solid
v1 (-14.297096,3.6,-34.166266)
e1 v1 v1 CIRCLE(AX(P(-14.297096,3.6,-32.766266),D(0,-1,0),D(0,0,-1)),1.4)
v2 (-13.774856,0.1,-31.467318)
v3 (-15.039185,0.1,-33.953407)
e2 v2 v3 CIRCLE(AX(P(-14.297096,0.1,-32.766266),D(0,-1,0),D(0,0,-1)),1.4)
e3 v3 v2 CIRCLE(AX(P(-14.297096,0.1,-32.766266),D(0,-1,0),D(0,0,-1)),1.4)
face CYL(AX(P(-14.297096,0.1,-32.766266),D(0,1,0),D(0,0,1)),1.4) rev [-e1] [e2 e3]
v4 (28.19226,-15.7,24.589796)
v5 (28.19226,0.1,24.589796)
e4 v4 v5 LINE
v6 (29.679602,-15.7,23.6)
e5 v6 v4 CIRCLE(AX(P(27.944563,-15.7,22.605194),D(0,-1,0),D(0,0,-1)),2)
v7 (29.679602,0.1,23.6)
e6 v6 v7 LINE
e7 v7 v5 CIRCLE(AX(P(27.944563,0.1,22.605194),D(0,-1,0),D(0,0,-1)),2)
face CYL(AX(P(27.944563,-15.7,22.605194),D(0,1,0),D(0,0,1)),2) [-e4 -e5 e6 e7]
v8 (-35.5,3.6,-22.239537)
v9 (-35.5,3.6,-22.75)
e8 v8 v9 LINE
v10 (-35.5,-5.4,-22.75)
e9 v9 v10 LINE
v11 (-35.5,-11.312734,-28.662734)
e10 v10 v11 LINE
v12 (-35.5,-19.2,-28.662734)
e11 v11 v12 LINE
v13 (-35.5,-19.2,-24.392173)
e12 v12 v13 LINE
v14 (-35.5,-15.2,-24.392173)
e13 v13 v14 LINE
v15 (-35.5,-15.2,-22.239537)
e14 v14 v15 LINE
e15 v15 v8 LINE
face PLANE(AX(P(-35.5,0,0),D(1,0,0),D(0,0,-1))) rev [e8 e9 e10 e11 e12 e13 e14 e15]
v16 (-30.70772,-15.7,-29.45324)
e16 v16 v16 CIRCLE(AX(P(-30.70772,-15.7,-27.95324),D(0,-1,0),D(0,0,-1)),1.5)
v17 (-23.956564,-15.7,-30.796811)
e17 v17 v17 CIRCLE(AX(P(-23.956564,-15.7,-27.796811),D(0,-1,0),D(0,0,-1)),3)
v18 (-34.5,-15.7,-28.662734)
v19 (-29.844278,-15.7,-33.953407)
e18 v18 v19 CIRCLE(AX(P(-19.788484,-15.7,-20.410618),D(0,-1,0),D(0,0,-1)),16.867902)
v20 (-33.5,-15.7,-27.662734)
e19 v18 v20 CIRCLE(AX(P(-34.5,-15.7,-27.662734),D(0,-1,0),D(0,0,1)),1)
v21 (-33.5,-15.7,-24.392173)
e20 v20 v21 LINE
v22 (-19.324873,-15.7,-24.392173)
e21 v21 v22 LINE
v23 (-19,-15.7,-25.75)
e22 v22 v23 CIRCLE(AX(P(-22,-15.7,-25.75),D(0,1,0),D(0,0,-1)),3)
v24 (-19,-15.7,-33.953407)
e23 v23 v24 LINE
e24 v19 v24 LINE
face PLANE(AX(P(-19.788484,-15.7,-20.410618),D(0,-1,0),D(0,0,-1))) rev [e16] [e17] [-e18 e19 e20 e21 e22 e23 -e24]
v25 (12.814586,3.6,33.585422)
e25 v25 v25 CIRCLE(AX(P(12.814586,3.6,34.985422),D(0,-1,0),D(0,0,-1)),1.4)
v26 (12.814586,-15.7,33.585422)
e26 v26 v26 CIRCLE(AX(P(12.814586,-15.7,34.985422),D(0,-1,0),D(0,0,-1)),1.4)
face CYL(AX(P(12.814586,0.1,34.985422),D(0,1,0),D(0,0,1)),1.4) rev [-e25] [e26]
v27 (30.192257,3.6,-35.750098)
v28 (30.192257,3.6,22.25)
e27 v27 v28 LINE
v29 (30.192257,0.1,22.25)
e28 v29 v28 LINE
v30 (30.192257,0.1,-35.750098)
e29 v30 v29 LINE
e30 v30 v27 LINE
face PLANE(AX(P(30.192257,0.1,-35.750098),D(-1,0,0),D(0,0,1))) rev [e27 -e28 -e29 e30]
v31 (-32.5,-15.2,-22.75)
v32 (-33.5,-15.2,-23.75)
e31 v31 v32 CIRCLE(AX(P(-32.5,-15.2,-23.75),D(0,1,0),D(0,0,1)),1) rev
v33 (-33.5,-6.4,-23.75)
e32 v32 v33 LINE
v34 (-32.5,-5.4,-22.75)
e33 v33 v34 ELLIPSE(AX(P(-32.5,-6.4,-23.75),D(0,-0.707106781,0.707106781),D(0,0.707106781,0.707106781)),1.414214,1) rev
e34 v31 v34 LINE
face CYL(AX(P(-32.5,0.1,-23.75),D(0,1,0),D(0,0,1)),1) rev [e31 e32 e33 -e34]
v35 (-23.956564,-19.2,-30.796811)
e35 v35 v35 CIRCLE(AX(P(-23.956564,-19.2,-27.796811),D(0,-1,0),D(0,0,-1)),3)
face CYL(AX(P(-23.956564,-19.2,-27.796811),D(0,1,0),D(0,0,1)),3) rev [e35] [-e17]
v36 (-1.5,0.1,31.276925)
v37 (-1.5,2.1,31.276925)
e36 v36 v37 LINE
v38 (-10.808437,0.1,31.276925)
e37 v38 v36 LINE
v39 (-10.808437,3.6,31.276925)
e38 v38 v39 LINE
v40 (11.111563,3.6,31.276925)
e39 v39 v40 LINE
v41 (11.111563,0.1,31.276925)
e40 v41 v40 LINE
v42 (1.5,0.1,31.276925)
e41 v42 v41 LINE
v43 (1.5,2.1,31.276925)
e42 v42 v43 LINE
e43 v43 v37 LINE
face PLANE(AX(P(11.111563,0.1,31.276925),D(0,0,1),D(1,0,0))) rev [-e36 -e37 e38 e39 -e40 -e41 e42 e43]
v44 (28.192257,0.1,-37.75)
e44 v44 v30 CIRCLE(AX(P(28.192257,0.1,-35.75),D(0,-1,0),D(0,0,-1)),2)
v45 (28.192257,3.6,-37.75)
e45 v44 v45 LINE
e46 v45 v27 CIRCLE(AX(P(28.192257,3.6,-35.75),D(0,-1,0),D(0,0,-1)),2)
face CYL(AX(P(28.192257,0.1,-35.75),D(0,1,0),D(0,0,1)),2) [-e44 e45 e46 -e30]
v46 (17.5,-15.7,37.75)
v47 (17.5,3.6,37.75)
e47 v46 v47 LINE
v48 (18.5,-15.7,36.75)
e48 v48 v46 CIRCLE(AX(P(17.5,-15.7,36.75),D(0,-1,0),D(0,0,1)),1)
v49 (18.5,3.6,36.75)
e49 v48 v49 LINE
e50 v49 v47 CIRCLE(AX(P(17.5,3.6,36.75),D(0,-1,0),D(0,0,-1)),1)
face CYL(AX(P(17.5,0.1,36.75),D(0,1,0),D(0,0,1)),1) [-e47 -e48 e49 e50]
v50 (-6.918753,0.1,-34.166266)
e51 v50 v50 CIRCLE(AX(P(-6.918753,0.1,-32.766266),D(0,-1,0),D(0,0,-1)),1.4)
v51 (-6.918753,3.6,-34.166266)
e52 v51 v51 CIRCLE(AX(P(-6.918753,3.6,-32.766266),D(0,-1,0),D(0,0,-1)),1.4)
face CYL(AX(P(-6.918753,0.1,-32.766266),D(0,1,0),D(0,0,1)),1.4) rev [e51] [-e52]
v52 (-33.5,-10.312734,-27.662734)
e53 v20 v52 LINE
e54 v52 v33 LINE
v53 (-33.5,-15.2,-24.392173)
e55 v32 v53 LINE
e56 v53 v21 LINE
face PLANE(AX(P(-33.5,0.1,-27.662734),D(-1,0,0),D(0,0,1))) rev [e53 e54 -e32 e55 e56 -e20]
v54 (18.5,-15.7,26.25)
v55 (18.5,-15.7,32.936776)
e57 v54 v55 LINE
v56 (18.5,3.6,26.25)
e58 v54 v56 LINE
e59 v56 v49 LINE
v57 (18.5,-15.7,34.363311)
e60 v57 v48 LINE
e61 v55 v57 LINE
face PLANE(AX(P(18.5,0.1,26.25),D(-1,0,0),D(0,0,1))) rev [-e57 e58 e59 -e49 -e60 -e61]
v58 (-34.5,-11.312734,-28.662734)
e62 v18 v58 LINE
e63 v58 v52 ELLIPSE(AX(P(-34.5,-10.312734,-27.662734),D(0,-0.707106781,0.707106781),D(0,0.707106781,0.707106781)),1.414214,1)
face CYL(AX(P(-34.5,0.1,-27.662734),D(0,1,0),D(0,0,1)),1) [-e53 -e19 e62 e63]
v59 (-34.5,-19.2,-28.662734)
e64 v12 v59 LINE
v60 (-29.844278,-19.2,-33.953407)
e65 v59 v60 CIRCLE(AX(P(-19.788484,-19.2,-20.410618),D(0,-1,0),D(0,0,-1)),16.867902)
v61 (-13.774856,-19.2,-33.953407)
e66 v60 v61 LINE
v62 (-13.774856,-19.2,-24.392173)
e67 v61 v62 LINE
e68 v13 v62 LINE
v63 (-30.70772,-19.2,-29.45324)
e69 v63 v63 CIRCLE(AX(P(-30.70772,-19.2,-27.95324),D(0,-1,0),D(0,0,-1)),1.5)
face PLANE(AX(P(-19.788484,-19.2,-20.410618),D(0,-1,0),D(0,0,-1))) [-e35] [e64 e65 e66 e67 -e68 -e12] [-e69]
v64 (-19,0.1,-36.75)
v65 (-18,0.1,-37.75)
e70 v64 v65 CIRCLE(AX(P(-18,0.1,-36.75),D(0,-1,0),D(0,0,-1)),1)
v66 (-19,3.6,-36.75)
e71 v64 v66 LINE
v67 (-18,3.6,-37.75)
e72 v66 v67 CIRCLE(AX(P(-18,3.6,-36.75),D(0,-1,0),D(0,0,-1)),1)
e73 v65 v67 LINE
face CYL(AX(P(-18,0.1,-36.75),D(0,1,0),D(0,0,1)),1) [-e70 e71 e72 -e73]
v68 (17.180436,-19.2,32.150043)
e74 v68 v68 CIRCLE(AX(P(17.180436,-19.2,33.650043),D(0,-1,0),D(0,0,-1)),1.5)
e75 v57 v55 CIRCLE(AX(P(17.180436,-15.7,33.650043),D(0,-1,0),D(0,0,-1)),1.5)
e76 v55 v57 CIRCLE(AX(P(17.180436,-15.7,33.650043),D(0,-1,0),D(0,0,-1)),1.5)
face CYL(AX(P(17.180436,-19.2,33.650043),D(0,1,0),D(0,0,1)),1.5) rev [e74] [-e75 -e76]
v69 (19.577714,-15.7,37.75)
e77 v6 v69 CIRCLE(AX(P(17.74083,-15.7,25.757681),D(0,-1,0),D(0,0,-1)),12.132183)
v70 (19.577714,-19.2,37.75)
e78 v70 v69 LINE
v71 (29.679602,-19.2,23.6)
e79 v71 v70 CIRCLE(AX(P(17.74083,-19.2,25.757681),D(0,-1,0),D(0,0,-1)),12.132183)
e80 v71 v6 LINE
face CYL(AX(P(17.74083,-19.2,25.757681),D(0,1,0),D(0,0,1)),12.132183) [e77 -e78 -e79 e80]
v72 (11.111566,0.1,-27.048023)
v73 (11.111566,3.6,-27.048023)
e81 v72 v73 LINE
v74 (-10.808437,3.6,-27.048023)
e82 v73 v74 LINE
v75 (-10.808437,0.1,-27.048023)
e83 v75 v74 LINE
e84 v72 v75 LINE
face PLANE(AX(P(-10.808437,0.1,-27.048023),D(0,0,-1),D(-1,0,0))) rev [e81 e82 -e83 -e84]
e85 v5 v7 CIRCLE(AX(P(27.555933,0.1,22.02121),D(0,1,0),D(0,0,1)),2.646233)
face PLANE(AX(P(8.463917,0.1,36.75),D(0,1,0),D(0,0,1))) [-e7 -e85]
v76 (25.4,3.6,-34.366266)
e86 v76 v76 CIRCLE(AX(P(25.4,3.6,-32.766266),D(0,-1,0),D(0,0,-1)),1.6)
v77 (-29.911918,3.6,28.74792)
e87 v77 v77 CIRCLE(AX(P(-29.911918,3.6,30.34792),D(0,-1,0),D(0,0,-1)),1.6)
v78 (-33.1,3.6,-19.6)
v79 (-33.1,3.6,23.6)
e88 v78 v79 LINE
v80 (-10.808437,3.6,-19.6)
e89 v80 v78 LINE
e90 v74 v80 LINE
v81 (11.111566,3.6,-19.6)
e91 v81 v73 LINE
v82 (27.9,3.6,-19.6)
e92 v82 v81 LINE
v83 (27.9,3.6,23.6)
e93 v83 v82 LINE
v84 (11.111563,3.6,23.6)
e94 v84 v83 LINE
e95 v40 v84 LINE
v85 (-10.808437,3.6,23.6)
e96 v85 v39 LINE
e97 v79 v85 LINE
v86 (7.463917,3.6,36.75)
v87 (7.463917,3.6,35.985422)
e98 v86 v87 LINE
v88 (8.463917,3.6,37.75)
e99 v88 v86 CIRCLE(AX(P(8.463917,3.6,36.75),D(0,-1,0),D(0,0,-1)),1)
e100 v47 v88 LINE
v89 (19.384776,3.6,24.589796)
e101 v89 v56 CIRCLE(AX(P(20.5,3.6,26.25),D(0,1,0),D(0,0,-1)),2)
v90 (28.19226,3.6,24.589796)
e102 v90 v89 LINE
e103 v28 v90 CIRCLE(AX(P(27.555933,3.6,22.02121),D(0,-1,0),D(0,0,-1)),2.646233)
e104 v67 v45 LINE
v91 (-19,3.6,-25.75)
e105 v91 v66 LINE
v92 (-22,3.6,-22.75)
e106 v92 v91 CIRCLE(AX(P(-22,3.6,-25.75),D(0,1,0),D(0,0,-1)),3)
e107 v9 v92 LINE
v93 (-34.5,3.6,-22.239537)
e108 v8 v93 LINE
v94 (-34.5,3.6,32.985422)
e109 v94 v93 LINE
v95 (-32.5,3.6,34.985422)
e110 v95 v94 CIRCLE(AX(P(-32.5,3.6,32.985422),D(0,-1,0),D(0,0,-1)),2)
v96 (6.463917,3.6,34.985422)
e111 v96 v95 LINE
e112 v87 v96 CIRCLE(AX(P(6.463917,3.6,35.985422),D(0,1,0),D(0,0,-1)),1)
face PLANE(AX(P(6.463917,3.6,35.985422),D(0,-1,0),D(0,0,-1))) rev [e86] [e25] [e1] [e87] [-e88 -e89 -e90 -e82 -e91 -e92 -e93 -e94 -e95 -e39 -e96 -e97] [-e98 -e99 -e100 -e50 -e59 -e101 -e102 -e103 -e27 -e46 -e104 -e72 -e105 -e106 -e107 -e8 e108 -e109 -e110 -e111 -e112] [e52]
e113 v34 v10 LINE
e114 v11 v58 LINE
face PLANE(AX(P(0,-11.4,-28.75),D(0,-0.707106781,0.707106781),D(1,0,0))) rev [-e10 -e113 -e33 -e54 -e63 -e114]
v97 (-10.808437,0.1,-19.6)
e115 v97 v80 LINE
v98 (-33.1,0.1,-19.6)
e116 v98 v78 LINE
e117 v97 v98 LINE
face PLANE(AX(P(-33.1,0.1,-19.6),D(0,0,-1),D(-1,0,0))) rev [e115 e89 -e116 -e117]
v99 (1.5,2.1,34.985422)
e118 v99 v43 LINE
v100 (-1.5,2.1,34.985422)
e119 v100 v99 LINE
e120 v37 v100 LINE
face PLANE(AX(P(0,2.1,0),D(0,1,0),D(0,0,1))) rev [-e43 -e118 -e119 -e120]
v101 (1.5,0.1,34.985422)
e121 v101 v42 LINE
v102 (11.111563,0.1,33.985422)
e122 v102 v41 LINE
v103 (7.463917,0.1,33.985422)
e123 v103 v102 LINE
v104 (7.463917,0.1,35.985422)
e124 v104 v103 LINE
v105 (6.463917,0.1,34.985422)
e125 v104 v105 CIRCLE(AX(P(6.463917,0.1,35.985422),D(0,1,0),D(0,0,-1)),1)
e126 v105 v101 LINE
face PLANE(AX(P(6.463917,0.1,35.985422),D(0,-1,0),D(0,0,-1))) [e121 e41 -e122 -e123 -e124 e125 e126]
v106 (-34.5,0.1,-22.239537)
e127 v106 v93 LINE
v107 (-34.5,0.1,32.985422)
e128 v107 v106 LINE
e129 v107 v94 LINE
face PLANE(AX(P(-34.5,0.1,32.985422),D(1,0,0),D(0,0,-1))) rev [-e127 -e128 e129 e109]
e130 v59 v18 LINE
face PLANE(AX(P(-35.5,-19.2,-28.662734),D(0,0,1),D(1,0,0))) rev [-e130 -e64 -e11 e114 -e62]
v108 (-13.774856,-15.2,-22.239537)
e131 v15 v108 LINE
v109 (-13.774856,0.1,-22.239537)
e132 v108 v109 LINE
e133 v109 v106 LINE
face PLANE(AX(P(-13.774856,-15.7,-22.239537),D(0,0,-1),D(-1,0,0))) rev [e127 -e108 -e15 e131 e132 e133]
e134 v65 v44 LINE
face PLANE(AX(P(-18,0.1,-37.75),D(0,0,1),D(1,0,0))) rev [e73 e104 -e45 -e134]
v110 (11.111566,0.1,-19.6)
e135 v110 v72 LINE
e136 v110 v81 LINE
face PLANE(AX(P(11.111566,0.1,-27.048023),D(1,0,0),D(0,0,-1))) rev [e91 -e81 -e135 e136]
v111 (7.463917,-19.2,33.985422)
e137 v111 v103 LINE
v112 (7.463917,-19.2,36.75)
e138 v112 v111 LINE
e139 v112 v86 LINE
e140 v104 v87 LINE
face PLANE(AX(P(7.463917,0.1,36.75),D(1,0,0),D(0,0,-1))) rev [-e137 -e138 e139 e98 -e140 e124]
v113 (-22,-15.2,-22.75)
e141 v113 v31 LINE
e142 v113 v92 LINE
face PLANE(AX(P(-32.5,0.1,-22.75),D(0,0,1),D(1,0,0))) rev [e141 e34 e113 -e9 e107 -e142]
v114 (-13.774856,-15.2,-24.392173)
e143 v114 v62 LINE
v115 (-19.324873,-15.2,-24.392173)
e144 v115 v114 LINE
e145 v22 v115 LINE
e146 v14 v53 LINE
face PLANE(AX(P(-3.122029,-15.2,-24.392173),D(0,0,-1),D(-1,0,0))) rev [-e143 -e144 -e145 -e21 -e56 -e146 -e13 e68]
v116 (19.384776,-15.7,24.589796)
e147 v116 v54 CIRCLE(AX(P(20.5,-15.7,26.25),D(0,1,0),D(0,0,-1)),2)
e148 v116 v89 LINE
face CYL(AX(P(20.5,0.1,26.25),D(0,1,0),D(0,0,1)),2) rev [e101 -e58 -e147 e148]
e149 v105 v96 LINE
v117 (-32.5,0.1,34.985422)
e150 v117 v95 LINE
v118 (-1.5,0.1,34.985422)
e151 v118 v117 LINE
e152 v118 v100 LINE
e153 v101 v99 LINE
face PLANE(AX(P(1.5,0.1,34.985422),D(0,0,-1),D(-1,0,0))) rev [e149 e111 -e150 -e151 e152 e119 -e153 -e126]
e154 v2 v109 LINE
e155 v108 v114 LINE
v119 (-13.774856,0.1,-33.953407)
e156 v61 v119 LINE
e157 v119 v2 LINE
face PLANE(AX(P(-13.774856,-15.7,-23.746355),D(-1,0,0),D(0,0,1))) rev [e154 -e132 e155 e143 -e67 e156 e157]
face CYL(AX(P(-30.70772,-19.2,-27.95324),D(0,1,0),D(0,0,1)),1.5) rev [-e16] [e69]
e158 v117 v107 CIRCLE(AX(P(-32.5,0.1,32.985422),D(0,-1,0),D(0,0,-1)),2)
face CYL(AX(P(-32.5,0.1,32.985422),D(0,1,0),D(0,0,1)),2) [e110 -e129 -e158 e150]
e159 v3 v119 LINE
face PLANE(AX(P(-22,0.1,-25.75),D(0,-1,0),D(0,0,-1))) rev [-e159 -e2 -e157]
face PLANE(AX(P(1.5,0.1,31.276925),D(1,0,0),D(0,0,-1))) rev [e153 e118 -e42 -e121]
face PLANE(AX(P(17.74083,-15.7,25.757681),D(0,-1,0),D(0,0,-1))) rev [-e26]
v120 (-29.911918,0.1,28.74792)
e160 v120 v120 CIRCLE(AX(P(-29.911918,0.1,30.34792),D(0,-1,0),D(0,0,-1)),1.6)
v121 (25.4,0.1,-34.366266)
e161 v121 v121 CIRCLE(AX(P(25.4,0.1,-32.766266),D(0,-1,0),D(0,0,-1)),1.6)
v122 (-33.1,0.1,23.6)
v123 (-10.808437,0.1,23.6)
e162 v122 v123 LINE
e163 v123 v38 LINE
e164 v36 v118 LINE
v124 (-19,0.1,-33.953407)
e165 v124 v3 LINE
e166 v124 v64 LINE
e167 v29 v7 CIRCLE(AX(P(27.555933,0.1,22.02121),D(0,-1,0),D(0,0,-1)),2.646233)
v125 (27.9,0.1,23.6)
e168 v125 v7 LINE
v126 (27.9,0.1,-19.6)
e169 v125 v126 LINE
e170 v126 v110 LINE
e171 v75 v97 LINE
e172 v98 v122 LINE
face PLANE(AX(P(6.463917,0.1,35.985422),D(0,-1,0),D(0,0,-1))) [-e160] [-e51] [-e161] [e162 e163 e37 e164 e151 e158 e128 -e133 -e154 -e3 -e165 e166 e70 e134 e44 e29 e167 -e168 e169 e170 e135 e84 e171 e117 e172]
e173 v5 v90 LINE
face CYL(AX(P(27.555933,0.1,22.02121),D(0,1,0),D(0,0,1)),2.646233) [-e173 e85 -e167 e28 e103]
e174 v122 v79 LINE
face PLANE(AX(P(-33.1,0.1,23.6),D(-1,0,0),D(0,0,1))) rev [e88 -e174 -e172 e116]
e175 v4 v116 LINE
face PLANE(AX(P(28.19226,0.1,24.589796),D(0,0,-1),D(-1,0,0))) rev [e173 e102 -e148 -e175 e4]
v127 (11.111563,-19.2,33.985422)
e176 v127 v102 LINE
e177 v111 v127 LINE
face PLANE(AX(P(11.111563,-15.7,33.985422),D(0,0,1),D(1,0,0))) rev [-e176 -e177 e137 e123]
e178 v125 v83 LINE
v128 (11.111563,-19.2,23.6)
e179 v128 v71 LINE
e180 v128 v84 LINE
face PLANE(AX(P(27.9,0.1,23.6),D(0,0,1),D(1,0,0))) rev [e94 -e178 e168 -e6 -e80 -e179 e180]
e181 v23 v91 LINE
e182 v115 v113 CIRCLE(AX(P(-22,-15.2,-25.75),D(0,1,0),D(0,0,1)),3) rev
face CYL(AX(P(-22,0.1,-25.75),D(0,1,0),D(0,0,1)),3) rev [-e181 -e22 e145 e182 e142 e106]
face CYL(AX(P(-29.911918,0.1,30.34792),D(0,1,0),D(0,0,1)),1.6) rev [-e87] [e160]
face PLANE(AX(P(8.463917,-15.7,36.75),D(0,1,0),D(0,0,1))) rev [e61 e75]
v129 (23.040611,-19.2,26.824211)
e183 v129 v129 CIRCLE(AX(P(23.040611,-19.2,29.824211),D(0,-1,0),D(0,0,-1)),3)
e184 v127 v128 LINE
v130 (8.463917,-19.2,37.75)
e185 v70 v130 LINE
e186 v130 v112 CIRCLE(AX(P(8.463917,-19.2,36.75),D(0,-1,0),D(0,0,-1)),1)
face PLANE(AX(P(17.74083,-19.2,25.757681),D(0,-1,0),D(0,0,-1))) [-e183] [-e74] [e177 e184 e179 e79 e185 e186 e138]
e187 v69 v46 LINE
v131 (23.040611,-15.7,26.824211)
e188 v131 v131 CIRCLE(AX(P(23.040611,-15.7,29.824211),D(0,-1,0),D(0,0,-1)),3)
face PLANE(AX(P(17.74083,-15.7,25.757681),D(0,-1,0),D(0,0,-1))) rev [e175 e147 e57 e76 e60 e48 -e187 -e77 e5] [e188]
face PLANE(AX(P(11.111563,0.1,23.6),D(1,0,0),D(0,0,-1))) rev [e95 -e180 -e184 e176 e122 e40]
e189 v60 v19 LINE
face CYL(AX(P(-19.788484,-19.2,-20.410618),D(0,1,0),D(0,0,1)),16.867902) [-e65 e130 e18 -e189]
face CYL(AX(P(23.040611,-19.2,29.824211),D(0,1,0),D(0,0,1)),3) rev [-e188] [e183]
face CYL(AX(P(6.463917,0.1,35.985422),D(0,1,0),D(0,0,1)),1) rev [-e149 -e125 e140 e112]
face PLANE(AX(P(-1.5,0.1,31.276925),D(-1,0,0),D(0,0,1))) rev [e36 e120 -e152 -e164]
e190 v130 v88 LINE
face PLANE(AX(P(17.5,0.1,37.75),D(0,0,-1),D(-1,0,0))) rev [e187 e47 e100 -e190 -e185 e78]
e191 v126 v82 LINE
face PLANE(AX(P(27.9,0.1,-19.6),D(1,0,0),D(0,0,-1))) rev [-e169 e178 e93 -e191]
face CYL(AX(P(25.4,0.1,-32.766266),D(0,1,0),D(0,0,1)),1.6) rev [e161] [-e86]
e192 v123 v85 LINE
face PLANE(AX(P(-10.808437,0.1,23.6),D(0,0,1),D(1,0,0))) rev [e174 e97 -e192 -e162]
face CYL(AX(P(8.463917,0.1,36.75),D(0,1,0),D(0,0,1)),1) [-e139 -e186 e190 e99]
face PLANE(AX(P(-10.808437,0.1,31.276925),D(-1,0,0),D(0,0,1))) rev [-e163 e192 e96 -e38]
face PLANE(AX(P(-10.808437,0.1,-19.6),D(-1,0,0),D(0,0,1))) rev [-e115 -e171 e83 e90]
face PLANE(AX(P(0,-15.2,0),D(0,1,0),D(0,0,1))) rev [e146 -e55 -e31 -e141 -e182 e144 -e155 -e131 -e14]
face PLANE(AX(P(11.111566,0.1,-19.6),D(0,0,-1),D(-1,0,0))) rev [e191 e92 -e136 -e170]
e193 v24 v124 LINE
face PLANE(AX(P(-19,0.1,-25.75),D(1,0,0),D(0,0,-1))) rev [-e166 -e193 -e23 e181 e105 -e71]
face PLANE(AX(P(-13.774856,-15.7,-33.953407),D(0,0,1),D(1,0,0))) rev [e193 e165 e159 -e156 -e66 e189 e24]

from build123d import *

# Parameters (mm, degrees)
SKETCH2_R           = 1.4
SKETCH2_R_2         = 1.6
BOSS_EXTRUDE1_DEPTH = 3.5
SKETCH3_R           = 1.4
BOSS_EXTRUDE2_DEPTH = 15.8
SKETCH4_R           = 3
SKETCH4_R_2         = 1.5
BOSS_EXTRUDE3_DEPTH = 3.5
SKETCH5_W           = 3
SKETCH5_H           = 3.708496363
BOSS_EXTRUDE4_DEPTH = 1.5
SKETCH7_W           = 35.498397003
SKETCH7_H           = 12.144188448
CUT_EXTRUDE2_DEPTH  = 4
BOSS_EXTRUDE5_DEPTH = 1
SKETCH6_W           = 15.172785082
SKETCH6_H           = 14.006435155
CUT_EXTRUDE3_DEPTH  = 15
CHAMFER1_START      = -11.4
CHAMFER1_DEPTH      = 0.087265638
CHAMFER1_START_2    = -35.5
CHAMFER1_2_DEPTH    = 3
CHAMFER1_START_3    = -11.312734362
CHAMFER1_3_DEPTH    = 7.312734362


with BuildPart() as part:
    # Sketch2 → Boss-Extrude1 (new body)
    with BuildSketch(Plane.XZ.offset(-3.6)):
        with BuildLine():
            Line((11.111566046, -27.048023457), (11.111566046, -19.6))
            Line((11.111566046, -19.6), (27.9, -19.6))
            Line((27.9, -19.6), (27.9, 23.6))
            Line((27.9, 23.6), (11.111563156, 23.6))
            Line((11.111563156, 23.6), (11.111563156, 31.276925258))
            Line((11.111563156, 31.276925258), (1.5, 31.276925258))
            Line((1.5, 31.276925258), (1.5, 34.985421621))
            Line((1.5, 34.985421621), (6.463917188, 34.985421621))
            ThreePointArc((6.463917188, 34.985421621), (7.171023969, 35.278314839), (7.463917188, 35.985421621))
            Line((7.463917188, 35.985421621), (7.463917188, 36.75))
            ThreePointArc((7.463917188, 36.75), (7.756810407, 37.457106781), (8.463917188, 37.75))
            Line((8.463917188, 37.75), (17.5, 37.75))
            ThreePointArc((17.5, 37.75), (18.207106781, 37.457106781), (18.5, 36.75))
            Line((18.5, 36.75), (18.5, 26.25))
            ThreePointArc((18.5, 26.25), (18.73500033, 25.309374588), (19.384776166, 24.589796458))
            Line((19.384776166, 24.589796458), (28.192260407, 24.589796458))
            ThreePointArc((28.192260407, 24.589796458), (29.567455824, 23.740606822), (30.192257213, 22.25))
            Line((30.192257213, 22.25), (30.192257213, -35.750098385))
            ThreePointArc((30.192257213, -35.750098385), (29.606435992, -37.164248347), (28.192257213, -37.75))
            Line((28.192257213, -37.75), (-18, -37.75))
            ThreePointArc((-18, -37.75), (-18.707106781, -37.457106781), (-19, -36.75))
            Line((-19, -36.75), (-19, -25.75))
            ThreePointArc((-19, -25.75), (-19.878679656, -23.628679656), (-22, -22.75))
            Line((-22, -22.75), (-32.5, -22.75))
            ThreePointArc((-32.5, -22.75), (-33.207106781, -23.042893219), (-33.5, -23.75))
            Line((-33.5, -23.75), (-33.5, -27.662734362))
            ThreePointArc((-33.5, -27.662734362), (-33.792893219, -28.369841143), (-34.5, -28.662734362))
            Line((-34.5, -28.662734362), (-34.5, 32.985421621))
            ThreePointArc((-34.5, 32.985421621), (-33.914213562, 34.399635183), (-32.5, 34.985421621))
            Line((-32.5, 34.985421621), (-1.5, 34.985421621))
            Line((-1.5, 34.985421621), (-1.5, 31.276925258))
            Line((-1.5, 31.276925258), (-10.808436895, 31.276925258))
            Line((-10.808436895, 31.276925258), (-10.808436895, 23.6))
            Line((-10.808436895, 23.6), (-33.1, 23.6))
            Line((-33.1, 23.6), (-33.1, -19.6))
            Line((-33.1, -19.6), (-10.808436895, -19.6))
            Line((-10.808436895, -19.6), (-10.808436895, -27.048023457))
            Line((-10.808436895, -27.048023457), (11.111566046, -27.048023457))
        make_face()
        with Locations(Location((-6.918752516, -32.76626587, 0), (0, 0, 270))):
            Circle(SKETCH2_R, mode=Mode.SUBTRACT)
        with Locations(Location((25.4, -32.76626587, 0), (0, 0, 270))):
            Circle(SKETCH2_R_2, mode=Mode.SUBTRACT)
        with Locations(Location((-14.297096298, -32.76626587, 0), (0, 0, 270))):
            Circle(SKETCH2_R, mode=Mode.SUBTRACT)
        with Locations(Location((-29.911917882, 30.347920192, 0), (0, 0, 270))):
            Circle(SKETCH2_R_2, mode=Mode.SUBTRACT)
        with Locations(Location((12.814585658, 34.985421621, 0), (0, 0, 270))):
            Circle(SKETCH2_R, mode=Mode.SUBTRACT)
    extrude(amount=BOSS_EXTRUDE1_DEPTH)

    # Sketch3 → Boss-Extrude2 (add)
    # profile 1 of 2: a face of its own
    with BuildSketch(Plane(origin=(0, 0.1, 0), x_dir=(-1, 0, 0), z_dir=(0, -1, 0))):
        with BuildLine():
            Line((-7.463917188, -33.985421621), (-7.463917188, -36.75))
            ThreePointArc((-7.463917188, -36.75), (-7.756810407, -37.457106781), (-8.463917188, -37.75))
            Line((-8.463917188, -37.75), (-17.5, -37.75))
            ThreePointArc((-17.5, -37.75), (-18.207106781, -37.457106781), (-18.5, -36.75))
            Line((-18.5, -36.75), (-18.5, -26.25))
            ThreePointArc((-18.5, -26.25), (-18.73500033, -25.309374588), (-19.384776166, -24.589796458))
            Line((-19.384776166, -24.589796458), (-28.192260407, -24.589796458))
            ThreePointArc((-28.192260407, -24.589796458), (-29.052595302, -24.270206108), (-29.679602398, -23.6))
            Line((-29.679602398, -23.6), (-11.111563156, -23.6))
            Line((-11.111563156, -23.6), (-11.111563156, -24.25))
            Line((-11.111563156, -24.25), (-11.111563156, -33.985421621))
            Line((-11.111563156, -33.985421621), (-7.463917188, -33.985421621))
        make_face()
        with Locations(Location((-12.814585658, -34.985421621, 0), (0, 0, 90))):
            Circle(SKETCH3_R, mode=Mode.SUBTRACT)
    # profile 2 of 2: a face of its own
    with BuildSketch(Plane(origin=(0, 0.1, 0), x_dir=(-1, 0, 0), z_dir=(0, -1, 0))):
        with BuildLine():
            Line((13.774855788, 22.239537014), (34.5, 22.239537014))
            Line((34.5, 22.239537014), (34.5, 23.75))
            Line((34.5, 23.75), (34.5, 28.662734362))
            ThreePointArc((34.5, 28.662734362), (33.792893219, 28.369841143), (33.5, 27.662734362))
            Line((33.5, 27.662734362), (33.5, 23.75))
            ThreePointArc((33.5, 23.75), (33.207106781, 23.042893219), (32.5, 22.75))
            Line((32.5, 22.75), (22, 22.75))
            ThreePointArc((22, 22.75), (20.777489524, 23.010389054), (19.767197945, 23.746354576))
            ThreePointArc((19.767197945, 23.746354576), (19.198357074, 24.67724797), (19, 25.75))
            Line((19, 25.75), (19, 33.953406826))
            Line((19, 33.953406826), (13.774855788, 33.953406826))
            Line((13.774855788, 33.953406826), (13.774855788, 31.467318277))
            Line((13.774855788, 31.467318277), (13.774855788, 23.746354576))
            Line((13.774855788, 23.746354576), (13.774855788, 22.239537014))
        make_face()
    extrude(amount=BOSS_EXTRUDE2_DEPTH)

    # Sketch4 → Boss-Extrude3 (add)
    # profile 1 of 2: a face of its own
    with BuildSketch(Plane.XZ.offset(15.7)):
        with BuildLine():
            Line((11.111563156, 23.6), (29.679602398, 23.6))
            ThreePointArc((29.679602398, 23.6), (27.614927524, 32.806940788), (19.577713664, 37.75))
            Line((19.577713664, 37.75), (8.463917188, 37.75))
            ThreePointArc((8.463917188, 37.75), (7.756810407, 37.457106781), (7.463917188, 36.75))
            Line((7.463917188, 36.75), (7.463917188, 33.985421621))
            Line((7.463917188, 33.985421621), (11.111563156, 33.985421621))
            Line((11.111563156, 33.985421621), (11.111563156, 23.6))
        make_face()
        with Locations(Location((23.040610867, 29.824211278, 0), (0, 0, 270))):
            Circle(SKETCH4_R, mode=Mode.SUBTRACT)
        with Locations(Location((17.180435895, 33.650043419, 0), (0, 0, 28.392671192))):
            Circle(SKETCH4_R_2, mode=Mode.SUBTRACT)
    # profile 2 of 2: a face of its own
    with BuildSketch(Plane.XZ.offset(15.7)):
        with BuildLine():
            Line((-29.84427835, -33.953406826), (-13.774855788, -33.953406826))
            Line((-13.774855788, -33.953406826), (-13.774855788, -22.239537014))
            Line((-13.774855788, -22.239537014), (-34.5, -22.239537014))
            Line((-34.5, -22.239537014), (-34.5, -28.662734362))
            ThreePointArc((-34.5, -28.662734362), (-32.451529424, -31.553930311), (-29.84427835, -33.953406826))
        make_face()
        with Locations(Location((-23.956564477, -27.796810843, 0), (0, 0, 270))):
            Circle(SKETCH4_R, mode=Mode.SUBTRACT)
        with Locations(Location((-30.707720306, -27.953239531, 0), (0, 0, 270))):
            Circle(SKETCH4_R_2, mode=Mode.SUBTRACT)
    extrude(amount=BOSS_EXTRUDE3_DEPTH)

    # Sketch5 → Boss-Extrude4 (add)
    with BuildSketch(Plane(origin=(0, 3.6, 0), x_dir=(1, 0, 0), z_dir=(0, 1, 0))):
        with Locations((0, -33.13117344)):
            Rectangle(SKETCH5_W, SKETCH5_H)
    extrude(amount=-BOSS_EXTRUDE4_DEPTH)

    # Sketch7 → Cut-Extrude2 (cut)
    with BuildSketch(Plane.XZ.offset(19.2)):
        with Locations((-20.871227876, -18.320079155)):
            Rectangle(SKETCH7_W, SKETCH7_H)
    extrude(amount=-CUT_EXTRUDE2_DEPTH, mode=Mode.SUBTRACT)

    # Sketch8 → Boss-Extrude5 (add)
    with BuildSketch(Plane.ZY.offset(34.5)):
        Polygon((-24.392173379, -19.2), (-24.392173379, -15.2), (-22.239537014, -15.2), (-22.239537014, 0.1), (-22.239537014, 3.6), (-28.662734362, 3.6), (-28.662734362, -19.2), align=None)
    extrude(amount=BOSS_EXTRUDE5_DEPTH)

    # Sketch6 → Cut-Extrude3 (cut)
    with BuildSketch(Plane(origin=(0, 3.6, 0), x_dir=(1, 0, 0), z_dir=(0, 1, 0))):
        with Locations((-37.568827946, 29.753217578)):
            Rectangle(SKETCH6_W, SKETCH6_H)
    extrude(amount=-CUT_EXTRUDE3_DEPTH, mode=Mode.SUBTRACT)

    # Chamfer1: read off the stored shape, not the designer's step
    # Chamfer1 outline → Chamfer1 (add)
    with BuildSketch(Plane(origin=(0, 0, 0), x_dir=(1, 0, 0), z_dir=(0, 1, 0)).offset(CHAMFER1_START)):
        with BuildLine():
            Line((-33.5, 23.75), (-33.5, 27.662734362))
            ThreePointArc((-33.5, 27.662734362), (-33.792893219, 28.369841143), (-34.5, 28.662734362))
            Line((-34.5, 28.662734362), (-35.5, 28.662734362))
            Line((-35.5, 28.662734362), (-35.5, 22.75))
            Line((-35.5, 22.75), (-32.5, 22.75))
            ThreePointArc((-32.5, 22.75), (-33.207106781, 23.042893219), (-33.5, 23.75))
        make_face()
    extrude(amount=CHAMFER1_DEPTH)

    # Chamfer1 2 outline → Chamfer1 2 (add)
    with BuildSketch(Plane.YZ.offset(CHAMFER1_START_2)):
        Polygon((-11.312734362, -28.662734362), (-5.4, -22.75), (-11.312734362, -22.75), align=None)
    extrude(amount=CHAMFER1_2_DEPTH)

    # Chamfer1 3 outline → Chamfer1 3 (cut)
    with BuildSketch(Plane(origin=(0, 0, 0), x_dir=(1, 0, 0), z_dir=(0, 1, 0)).offset(CHAMFER1_START_3)):
        with BuildLine():
            ThreePointArc((-34.5, 28.662734362), (-33.792893219, 28.369841143), (-33.5, 27.662734362))
            Line((-33.5, 27.662734362), (-33.5, 23.75))
            ThreePointArc((-33.5, 23.75), (-33.207106781, 23.042893219), (-32.5, 22.75))
            Line((-32.5, 22.75), (-32.5, 30))
            Line((-32.5, 30), (-36, 30))
            Line((-36, 30), (-36, 28.662734363))
            Line((-36, 28.662734363), (-34.5, 28.662734362))
        make_face()
    extrude(amount=CHAMFER1_3_DEPTH, mode=Mode.SUBTRACT)


solid = part.part
